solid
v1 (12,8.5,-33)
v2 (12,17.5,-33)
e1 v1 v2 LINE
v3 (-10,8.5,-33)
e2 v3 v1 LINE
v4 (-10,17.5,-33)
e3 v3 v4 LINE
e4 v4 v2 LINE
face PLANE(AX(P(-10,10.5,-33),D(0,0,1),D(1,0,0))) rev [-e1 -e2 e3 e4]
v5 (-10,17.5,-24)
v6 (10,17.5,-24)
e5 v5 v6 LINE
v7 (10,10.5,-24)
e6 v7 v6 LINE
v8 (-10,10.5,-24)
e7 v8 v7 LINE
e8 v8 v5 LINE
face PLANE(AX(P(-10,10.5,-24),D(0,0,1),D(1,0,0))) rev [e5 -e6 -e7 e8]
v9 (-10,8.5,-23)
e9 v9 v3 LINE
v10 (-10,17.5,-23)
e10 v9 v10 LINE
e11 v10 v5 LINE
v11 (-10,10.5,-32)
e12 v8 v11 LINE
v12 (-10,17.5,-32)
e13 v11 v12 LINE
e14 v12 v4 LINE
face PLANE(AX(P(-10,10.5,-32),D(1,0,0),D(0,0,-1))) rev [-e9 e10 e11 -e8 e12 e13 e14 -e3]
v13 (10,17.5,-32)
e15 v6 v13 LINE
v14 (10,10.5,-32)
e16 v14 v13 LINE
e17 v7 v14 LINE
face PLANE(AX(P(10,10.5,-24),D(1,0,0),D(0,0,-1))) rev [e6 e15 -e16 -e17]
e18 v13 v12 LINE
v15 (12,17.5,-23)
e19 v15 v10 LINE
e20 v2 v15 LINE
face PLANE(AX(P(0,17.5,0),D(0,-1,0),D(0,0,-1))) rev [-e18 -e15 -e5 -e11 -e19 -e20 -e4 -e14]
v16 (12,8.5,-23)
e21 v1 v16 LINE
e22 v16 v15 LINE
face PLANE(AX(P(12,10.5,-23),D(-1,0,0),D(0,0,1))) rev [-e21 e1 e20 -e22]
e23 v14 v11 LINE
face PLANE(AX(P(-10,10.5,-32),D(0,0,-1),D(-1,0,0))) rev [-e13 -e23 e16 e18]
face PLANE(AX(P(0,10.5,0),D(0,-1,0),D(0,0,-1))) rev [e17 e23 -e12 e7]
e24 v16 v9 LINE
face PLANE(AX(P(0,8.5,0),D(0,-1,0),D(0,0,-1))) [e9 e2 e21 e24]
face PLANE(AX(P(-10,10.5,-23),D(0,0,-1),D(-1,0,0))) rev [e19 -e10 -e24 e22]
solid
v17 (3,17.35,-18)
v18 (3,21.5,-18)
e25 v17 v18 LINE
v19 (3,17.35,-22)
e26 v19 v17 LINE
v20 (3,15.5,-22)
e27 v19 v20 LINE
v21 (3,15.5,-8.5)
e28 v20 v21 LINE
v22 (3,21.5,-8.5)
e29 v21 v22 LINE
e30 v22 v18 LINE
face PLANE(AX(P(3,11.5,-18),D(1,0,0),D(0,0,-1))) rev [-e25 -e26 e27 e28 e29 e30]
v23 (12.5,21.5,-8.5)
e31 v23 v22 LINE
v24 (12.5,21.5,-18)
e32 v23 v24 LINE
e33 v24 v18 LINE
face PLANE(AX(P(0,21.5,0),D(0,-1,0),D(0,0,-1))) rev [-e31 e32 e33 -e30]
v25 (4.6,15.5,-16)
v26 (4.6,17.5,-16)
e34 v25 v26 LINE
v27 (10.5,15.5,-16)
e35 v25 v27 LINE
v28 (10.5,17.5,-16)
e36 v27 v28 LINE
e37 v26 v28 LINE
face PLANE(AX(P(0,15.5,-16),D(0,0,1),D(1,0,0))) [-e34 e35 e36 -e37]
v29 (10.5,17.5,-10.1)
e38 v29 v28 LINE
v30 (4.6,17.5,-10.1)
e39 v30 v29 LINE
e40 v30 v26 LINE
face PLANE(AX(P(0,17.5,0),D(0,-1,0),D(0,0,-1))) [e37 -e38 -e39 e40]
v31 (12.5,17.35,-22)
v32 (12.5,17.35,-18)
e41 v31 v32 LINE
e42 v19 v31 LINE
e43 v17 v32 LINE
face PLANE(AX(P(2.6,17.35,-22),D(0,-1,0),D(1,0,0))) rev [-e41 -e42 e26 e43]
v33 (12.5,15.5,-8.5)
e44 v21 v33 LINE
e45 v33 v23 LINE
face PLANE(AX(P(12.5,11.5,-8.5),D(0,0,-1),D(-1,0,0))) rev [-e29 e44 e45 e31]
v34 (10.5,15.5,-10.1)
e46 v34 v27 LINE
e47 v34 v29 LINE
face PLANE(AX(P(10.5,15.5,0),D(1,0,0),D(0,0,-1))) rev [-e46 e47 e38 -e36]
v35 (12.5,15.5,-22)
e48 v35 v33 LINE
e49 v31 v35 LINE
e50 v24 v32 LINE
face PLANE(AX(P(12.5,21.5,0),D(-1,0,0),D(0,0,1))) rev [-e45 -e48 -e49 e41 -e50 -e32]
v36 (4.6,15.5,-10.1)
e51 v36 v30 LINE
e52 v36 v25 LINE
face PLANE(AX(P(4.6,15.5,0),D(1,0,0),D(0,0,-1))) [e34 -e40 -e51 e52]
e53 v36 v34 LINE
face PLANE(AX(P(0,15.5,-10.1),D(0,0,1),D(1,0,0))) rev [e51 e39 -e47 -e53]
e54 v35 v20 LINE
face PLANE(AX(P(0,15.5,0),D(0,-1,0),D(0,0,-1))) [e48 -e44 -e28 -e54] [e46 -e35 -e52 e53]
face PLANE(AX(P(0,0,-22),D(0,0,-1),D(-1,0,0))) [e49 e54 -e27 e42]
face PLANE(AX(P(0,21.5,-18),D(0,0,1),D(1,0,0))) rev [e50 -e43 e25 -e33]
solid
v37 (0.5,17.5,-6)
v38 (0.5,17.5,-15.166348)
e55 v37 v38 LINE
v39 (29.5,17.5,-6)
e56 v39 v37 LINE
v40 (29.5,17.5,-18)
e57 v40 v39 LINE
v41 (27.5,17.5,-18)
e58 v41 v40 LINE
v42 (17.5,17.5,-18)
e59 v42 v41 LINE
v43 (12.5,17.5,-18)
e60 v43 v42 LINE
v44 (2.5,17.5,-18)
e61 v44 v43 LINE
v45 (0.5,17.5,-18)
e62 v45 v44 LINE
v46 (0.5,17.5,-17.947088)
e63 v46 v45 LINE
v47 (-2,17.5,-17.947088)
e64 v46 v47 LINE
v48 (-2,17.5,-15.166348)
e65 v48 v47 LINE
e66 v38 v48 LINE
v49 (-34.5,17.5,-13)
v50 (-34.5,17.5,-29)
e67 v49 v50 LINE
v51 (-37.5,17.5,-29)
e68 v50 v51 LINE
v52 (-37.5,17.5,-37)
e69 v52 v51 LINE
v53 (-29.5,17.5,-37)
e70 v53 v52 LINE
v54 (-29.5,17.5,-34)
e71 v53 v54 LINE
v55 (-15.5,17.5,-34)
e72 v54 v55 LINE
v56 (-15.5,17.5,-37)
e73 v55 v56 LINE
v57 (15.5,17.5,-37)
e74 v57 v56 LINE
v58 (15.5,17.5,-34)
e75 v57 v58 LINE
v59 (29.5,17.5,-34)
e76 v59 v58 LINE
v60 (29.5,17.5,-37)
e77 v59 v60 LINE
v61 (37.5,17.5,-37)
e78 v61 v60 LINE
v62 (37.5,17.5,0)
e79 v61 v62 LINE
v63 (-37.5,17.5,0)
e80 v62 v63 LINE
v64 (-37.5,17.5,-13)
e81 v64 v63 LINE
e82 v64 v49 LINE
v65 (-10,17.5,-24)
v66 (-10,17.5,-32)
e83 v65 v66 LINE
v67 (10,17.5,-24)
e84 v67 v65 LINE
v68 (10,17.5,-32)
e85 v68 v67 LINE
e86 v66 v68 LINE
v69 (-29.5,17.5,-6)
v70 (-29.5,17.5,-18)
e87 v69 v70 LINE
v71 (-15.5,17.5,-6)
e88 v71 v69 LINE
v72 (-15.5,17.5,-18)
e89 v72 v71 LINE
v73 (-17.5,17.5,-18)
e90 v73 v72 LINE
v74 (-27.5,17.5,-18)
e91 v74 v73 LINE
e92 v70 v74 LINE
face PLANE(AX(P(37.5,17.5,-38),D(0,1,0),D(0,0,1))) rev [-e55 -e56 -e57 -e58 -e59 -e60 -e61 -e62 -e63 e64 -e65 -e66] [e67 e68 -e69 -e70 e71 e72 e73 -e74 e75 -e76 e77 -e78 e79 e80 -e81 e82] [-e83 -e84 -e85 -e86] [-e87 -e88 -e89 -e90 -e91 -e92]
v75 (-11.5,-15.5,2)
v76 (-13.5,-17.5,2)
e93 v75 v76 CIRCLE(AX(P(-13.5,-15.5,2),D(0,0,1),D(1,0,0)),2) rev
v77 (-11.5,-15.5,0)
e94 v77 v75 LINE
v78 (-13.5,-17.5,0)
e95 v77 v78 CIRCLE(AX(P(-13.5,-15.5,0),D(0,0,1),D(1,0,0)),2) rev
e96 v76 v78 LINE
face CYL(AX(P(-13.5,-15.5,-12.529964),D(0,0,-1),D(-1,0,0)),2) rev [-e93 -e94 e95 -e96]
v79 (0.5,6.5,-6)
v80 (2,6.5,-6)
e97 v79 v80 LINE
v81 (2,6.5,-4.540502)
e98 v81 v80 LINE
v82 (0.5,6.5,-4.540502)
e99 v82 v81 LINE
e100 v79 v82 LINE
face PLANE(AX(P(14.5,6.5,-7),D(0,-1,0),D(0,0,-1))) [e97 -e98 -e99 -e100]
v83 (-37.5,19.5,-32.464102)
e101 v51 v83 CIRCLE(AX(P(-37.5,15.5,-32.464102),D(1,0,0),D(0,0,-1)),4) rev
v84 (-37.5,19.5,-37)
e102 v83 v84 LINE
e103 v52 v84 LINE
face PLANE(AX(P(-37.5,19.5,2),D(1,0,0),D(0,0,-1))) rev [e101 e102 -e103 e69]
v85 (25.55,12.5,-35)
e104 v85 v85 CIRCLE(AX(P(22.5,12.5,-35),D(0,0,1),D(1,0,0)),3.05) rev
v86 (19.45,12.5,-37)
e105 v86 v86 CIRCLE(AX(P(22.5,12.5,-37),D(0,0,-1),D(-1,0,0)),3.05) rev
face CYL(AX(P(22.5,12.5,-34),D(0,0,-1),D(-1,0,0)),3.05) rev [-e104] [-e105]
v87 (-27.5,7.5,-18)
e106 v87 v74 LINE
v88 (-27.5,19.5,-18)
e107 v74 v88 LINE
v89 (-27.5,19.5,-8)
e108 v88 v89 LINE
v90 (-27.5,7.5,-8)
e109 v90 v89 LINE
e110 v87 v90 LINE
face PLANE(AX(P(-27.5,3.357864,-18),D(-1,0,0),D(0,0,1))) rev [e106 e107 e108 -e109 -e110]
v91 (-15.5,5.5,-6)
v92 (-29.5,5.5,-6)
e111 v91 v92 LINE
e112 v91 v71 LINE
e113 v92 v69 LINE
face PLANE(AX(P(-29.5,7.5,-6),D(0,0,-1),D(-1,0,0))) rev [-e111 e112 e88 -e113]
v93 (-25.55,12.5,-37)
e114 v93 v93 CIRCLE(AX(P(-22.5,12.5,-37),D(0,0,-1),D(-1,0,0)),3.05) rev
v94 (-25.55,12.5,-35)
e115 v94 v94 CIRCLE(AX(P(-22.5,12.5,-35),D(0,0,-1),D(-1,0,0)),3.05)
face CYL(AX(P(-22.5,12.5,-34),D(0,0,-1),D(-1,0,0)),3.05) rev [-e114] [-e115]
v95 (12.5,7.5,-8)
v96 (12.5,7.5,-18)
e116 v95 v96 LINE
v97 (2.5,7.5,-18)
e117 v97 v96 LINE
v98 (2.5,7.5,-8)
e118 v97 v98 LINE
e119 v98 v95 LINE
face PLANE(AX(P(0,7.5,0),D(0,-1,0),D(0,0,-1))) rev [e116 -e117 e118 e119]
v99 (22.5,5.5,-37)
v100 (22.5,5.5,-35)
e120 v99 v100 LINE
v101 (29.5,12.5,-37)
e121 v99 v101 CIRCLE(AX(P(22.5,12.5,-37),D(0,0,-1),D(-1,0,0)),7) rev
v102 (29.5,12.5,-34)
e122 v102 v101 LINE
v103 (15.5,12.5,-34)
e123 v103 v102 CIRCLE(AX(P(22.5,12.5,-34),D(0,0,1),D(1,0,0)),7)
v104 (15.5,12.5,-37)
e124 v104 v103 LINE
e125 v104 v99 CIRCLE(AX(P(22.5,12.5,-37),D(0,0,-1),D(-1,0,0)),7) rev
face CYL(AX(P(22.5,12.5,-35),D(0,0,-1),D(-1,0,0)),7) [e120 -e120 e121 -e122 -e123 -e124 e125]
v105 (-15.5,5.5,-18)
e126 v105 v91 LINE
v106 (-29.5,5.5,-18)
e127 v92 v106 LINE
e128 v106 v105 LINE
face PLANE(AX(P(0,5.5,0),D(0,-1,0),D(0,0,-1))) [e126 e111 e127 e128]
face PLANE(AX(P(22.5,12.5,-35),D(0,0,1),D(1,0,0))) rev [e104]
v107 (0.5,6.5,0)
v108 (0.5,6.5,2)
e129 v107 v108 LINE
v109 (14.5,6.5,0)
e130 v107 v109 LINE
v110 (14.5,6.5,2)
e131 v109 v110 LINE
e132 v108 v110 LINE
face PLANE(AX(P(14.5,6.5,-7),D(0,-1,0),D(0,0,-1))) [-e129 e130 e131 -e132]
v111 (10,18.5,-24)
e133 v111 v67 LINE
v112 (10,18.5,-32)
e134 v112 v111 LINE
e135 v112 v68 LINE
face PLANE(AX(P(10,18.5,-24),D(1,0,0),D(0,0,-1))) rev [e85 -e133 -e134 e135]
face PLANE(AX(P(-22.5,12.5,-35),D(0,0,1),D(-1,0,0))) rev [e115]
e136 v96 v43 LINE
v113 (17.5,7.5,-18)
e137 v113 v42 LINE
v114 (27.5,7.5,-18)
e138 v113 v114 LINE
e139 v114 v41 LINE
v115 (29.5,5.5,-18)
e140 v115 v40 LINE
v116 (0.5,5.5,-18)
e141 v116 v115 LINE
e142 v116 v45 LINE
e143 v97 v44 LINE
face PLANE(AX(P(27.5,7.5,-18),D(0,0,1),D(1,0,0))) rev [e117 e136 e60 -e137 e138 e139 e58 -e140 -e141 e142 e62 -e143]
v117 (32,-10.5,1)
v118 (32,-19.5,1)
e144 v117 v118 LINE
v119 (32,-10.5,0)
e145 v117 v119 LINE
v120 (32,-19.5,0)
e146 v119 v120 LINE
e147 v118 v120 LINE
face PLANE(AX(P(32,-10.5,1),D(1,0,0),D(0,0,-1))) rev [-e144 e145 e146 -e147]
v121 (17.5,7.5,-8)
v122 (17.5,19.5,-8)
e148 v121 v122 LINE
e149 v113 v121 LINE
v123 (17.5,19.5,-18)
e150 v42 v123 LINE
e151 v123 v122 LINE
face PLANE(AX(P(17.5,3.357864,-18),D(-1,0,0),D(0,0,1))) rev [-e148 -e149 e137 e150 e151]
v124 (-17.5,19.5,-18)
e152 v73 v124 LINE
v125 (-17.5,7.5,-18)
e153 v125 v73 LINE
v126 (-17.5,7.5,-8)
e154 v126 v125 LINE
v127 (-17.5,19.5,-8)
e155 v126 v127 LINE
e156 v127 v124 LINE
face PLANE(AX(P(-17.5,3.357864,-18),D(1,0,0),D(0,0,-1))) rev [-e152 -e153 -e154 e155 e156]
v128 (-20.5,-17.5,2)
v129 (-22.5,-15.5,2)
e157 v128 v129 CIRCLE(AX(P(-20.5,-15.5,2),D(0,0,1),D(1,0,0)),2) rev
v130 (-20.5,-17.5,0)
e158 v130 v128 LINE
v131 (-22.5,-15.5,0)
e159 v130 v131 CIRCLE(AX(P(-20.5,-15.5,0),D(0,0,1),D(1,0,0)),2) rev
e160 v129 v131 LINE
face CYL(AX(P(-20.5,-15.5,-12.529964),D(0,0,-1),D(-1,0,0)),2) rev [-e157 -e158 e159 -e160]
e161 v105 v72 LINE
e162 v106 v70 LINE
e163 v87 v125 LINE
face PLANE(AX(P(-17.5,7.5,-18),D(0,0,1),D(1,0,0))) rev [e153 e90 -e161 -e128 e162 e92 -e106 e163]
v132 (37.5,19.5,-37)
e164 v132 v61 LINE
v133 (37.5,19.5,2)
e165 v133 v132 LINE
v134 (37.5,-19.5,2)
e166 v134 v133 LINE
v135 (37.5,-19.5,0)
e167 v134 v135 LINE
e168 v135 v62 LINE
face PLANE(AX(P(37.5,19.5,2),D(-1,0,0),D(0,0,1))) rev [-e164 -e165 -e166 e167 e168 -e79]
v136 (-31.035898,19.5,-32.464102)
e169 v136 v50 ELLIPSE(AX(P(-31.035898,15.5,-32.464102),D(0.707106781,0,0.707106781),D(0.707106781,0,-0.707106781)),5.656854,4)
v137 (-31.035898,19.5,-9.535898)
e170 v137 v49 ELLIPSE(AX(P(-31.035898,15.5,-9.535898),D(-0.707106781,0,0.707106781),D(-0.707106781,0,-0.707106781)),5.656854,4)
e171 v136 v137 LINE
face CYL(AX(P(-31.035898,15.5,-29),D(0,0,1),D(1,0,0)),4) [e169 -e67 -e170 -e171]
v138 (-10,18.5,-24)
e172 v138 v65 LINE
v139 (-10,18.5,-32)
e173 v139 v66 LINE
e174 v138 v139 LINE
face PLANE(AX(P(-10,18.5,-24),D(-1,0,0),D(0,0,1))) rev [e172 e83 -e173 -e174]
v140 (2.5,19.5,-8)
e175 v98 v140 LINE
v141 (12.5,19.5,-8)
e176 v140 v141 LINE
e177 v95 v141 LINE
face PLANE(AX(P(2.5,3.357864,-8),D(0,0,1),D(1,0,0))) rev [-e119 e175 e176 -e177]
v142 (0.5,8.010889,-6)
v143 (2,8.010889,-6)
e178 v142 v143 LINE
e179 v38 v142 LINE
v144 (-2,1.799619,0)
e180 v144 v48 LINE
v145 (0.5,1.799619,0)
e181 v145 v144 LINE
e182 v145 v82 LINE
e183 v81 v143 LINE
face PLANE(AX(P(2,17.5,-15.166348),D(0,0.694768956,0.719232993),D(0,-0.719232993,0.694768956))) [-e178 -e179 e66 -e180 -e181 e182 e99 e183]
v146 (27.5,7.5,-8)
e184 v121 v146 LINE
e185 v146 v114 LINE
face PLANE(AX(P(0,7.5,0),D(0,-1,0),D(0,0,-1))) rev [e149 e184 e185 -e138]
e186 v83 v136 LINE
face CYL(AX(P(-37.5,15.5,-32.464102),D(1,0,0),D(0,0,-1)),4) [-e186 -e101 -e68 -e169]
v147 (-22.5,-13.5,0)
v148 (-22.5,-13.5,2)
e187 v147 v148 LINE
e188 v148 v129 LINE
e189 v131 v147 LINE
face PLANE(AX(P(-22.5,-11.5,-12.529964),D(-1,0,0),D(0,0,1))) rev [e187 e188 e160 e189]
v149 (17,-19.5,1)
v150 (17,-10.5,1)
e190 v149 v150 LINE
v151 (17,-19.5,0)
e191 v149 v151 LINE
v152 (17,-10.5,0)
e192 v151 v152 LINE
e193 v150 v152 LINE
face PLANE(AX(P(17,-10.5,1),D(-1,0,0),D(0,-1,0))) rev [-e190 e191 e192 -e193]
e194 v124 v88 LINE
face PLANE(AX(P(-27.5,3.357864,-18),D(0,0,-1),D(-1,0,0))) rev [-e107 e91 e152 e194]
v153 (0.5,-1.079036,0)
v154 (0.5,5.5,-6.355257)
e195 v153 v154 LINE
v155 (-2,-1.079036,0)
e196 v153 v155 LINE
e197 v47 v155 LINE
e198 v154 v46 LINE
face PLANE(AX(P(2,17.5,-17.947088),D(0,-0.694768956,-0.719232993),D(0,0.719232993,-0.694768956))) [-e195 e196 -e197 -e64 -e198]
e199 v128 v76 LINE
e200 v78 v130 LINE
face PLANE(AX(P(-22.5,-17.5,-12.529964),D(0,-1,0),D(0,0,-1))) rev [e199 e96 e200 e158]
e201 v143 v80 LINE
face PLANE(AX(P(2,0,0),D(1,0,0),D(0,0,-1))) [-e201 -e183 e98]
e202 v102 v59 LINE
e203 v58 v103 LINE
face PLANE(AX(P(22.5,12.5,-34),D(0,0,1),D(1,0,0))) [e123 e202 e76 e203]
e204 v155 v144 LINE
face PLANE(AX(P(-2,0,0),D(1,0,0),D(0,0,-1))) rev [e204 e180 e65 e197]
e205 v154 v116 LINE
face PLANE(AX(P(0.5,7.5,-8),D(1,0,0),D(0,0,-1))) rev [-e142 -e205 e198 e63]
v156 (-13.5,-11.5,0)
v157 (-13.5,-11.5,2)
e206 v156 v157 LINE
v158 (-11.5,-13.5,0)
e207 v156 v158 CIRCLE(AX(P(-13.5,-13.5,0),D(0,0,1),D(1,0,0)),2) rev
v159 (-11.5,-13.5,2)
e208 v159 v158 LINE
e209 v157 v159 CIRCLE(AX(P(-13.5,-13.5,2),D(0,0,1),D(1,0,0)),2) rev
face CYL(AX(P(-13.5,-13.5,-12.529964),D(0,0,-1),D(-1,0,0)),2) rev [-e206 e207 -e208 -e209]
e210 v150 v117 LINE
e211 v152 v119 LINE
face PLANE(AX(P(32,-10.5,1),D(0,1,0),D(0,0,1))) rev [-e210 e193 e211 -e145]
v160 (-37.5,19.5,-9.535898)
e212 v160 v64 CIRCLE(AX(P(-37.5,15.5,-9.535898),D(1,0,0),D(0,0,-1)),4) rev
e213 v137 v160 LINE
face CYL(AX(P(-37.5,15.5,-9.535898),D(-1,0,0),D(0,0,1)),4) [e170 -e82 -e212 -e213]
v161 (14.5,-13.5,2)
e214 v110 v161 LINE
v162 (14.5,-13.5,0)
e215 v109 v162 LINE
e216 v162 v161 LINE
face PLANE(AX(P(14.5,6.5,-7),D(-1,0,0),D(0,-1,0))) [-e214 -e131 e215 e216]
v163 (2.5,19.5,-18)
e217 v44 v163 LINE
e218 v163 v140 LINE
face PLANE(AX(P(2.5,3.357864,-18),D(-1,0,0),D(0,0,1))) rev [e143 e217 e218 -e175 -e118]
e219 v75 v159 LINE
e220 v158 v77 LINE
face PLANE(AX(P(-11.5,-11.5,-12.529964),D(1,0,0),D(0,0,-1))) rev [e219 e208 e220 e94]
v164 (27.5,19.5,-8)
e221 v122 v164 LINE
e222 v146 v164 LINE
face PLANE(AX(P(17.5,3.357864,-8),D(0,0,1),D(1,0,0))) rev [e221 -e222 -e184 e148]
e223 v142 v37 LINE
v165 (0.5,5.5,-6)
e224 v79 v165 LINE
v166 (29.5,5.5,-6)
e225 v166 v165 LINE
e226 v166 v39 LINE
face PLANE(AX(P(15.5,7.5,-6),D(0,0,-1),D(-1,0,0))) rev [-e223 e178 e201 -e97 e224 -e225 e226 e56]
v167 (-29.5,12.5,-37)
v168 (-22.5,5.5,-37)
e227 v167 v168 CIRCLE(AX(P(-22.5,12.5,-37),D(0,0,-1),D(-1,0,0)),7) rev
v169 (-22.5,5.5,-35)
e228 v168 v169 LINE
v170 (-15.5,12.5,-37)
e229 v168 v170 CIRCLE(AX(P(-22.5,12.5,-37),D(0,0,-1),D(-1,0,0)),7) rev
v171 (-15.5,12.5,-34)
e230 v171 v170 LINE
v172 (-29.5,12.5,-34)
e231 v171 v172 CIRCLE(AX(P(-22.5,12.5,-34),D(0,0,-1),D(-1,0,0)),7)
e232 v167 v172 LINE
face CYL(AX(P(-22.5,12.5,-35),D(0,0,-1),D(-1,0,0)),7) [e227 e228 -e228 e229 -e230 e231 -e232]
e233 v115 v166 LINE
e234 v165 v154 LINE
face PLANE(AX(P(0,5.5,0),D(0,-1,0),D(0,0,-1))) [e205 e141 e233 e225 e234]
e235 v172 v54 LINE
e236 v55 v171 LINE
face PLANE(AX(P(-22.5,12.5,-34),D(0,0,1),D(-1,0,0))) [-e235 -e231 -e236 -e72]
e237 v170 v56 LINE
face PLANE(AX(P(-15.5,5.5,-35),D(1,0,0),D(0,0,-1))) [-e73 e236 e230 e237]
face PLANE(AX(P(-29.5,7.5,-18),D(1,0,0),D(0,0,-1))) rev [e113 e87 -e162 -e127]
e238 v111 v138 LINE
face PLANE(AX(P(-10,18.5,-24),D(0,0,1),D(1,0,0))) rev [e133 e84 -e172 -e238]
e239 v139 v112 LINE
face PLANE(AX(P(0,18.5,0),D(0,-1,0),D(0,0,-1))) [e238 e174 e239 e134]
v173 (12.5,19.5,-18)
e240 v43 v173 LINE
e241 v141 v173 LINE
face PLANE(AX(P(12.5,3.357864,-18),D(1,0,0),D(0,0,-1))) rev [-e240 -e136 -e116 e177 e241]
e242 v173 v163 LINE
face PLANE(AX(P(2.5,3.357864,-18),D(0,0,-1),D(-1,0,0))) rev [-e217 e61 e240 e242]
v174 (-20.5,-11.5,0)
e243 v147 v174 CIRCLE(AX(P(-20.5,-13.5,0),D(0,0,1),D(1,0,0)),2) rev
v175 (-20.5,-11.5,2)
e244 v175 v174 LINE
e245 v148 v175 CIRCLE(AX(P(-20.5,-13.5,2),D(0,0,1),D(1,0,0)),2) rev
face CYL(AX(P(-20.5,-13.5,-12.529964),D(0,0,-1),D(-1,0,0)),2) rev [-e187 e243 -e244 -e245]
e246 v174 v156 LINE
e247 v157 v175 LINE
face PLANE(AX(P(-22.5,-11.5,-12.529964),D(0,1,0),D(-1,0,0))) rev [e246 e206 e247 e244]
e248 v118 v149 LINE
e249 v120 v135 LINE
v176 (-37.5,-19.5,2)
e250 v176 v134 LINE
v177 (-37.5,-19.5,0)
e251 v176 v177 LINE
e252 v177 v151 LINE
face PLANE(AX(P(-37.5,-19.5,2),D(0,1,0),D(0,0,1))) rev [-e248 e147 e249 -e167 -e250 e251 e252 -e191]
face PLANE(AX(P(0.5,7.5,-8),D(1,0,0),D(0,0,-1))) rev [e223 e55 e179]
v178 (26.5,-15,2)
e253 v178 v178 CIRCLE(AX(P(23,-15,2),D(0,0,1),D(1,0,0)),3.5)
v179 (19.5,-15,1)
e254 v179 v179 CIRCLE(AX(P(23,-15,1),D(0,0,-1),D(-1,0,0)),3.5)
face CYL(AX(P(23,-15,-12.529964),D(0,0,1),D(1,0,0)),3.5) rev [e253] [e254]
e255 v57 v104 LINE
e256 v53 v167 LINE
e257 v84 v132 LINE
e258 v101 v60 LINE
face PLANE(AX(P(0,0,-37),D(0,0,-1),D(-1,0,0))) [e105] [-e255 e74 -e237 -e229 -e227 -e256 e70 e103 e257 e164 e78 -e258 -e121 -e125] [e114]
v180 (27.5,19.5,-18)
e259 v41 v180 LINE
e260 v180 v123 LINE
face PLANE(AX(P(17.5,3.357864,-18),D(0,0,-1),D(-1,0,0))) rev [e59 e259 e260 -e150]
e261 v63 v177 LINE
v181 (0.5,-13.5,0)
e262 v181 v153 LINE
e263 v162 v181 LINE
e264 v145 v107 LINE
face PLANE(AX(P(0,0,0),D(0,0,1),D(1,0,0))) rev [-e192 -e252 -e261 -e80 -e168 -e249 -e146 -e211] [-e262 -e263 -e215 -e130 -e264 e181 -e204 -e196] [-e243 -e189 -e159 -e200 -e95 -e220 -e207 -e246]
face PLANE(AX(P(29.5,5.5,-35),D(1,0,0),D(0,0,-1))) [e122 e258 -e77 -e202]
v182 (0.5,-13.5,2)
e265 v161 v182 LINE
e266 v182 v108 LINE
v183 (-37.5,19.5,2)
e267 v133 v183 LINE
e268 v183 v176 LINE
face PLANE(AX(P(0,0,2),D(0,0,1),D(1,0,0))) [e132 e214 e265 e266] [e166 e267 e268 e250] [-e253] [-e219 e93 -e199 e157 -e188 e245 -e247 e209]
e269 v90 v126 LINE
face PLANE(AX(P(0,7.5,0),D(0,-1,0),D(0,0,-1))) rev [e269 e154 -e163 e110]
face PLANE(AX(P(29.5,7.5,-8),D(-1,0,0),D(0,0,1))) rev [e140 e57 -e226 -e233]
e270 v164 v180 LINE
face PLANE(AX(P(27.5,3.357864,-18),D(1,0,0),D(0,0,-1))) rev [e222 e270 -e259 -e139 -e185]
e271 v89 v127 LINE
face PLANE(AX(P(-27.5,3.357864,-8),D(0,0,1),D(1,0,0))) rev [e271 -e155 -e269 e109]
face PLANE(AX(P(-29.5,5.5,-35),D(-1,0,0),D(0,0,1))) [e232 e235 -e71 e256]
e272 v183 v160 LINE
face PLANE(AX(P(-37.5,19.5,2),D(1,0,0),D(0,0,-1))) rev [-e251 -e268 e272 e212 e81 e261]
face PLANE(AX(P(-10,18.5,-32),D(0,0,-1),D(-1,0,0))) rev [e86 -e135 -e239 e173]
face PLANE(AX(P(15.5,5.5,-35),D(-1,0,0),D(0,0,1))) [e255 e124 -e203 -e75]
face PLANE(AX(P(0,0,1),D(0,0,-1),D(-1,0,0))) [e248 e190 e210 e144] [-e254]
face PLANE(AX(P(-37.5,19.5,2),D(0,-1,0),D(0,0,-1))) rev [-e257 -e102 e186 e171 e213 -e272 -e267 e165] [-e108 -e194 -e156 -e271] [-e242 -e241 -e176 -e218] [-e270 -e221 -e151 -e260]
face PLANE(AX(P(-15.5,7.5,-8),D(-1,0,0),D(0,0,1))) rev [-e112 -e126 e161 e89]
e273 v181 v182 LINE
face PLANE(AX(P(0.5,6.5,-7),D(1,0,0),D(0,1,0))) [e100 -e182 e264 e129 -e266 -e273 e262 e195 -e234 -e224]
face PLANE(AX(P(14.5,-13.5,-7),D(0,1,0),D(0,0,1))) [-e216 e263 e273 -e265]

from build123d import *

# Parameters (mm, degrees)
SKETCH1_W                 = 75
SKETCH1_H                 = 39
BOSS_EXTRUDE1_DEPTH       = 2
SKETCH2_W                 = 75
SKETCH2_H                 = 2
BOSS_EXTRUDE2_DEPTH       = 38
SKETCH4_R                 = 3.5
SKETCH4_R_2               = 2.25
SKETCH4_W                 = 11
SKETCH4_H                 = 6
CUT_EXTRUDE1_DEPTH        = 2
SKETCH6_W                 = 10
SKETCH6_H                 = 10
CUT_EXTRUDE2_DEPTH        = 2
BOSS_EXTRUDE3_DEPTH       = 10
SKETCH8_W                 = 14
SKETCH8_H                 = 12
BOSS_EXTRUDE4_DEPTH       = 2
SKETCH9_W                 = 10
SKETCH9_H                 = 10
BOSS_EXTRUDE5_DEPTH       = 4
SKETCH10_W                = 9.9
SKETCH10_H                = 9.9
SKETCH10_W_2              = 5.9
SKETCH10_H_2              = 5.9
BOSS_EXTRUDE9_DEPTH       = 2
SKETCH11_W                = 9.9
SKETCH11_H                = 1.85
BOSS_EXTRUDE10_DEPTH      = 4
SKETCH12_R                = 4.25
SKETCH12_R_2              = 2.25
BOSS_EXTRUDE11_DEPTH      = 2
SKETCH16_W                = 14
SKETCH16_H                = 9.5
SKETCH16_W_2              = 11
SKETCH16_H_2              = 6
BOSS_EXTRUDE13_DEPTH      = 2
CUT_EXTRUDE3_DEPTH        = 65.955754172
FILLET1_R                 = 2
FILLET2_R                 = 2
BOSS_EXTRUDE14_DEPTH      = 2
BOSS_EXTRUDE14_DEPTH_BACK = 2
CUT_EXTRUDE4_DEPTH        = 7
CUT_EXTRUDE4_DEPTH_BACK   = 10
SKETCH19_W                = 14
SKETCH19_H                = 20
SKETCH22_W                = 14
SKETCH22_H                = 14
BOSS_EXTRUDE15_DEPTH      = 3
FILLET3_R                 = 7
SKETCH23_R                = 3.05
CUT_EXTRUDE6_DEPTH        = 4
SKETCH24_W                = 1
SKETCH24_H                = 12
BOSS_EXTRUDE16_DEPTH      = 12
SKETCH25_W                = 16.318850604
SKETCH25_H                = 8.975597068
SKETCH25_W_2              = 14
SKETCH25_H_2              = 9.692484115
CUT_EXTRUDE7_DEPTH        = 2
CUT_EXTRUDE8_START        = -2
SKETCH26_R                = 4.25
CUT_EXTRUDE8_DEPTH        = 2
SKETCH27_R                = 2.25
BOSS_EXTRUDE17_DEPTH      = 2
SKETCH28_W                = 85.525995753
SKETCH28_H                = 26.786934063
CUT_EXTRUDE9_DEPTH        = 1
BOSS_EXTRUDE18_DEPTH      = 1
CUT_EXTRUDE10_DEPTH       = 10
CUT_EXTRUDE11_START       = -1
SKETCH31_W                = 15
SKETCH31_H                = 9
SKETCH31_R                = 3.5
CUT_EXTRUDE11_DEPTH       = 1
SKETCH32_W                = 20
SKETCH32_H                = 8
CUT_EXTRUDE12_DEPTH       = 1
BOSS_EXTRUDE19_START      = -1
SKETCH34_W                = 14
SKETCH34_H                = 1
BOSS_EXTRUDE19_DEPTH      = 1
SKETCH35_W                = 3
SKETCH35_H                = 16
CUT_EXTRUDE13_DEPTH       = 66.545785524
FILLET4_R                 = 4
SKETCH36_W                = 0.4
SKETCH36_H                = 4
CUT_EXTRUDE14_DEPTH       = 10
BOSS_EXTRUDE20_DEPTH      = 7
SKETCH38_W                = 22
SKETCH38_H                = 10
BOSS_EXTRUDE21_DEPTH      = 2


# Some blends are built 0.0001 mm under size
with BuildPart() as part:
    # Sketch1 → Boss-Extrude1 (new body)
    with BuildSketch(Plane.XY):
        Rectangle(SKETCH1_W, SKETCH1_H)
    extrude(amount=BOSS_EXTRUDE1_DEPTH)

    # Sketch2 → Boss-Extrude2 (add)
    with BuildSketch(Plane(origin=(0, 0, 0), x_dir=(-1, 0, 0), z_dir=(0, 0, -1))):
        with Locations((0, 18.5)):
            Rectangle(SKETCH2_W, SKETCH2_H)
    extrude(amount=BOSS_EXTRUDE2_DEPTH)

    # Sketch4 → Cut-Extrude1 (cut)
    with BuildSketch(Plane.XY.offset(2)):
        with Locations((23, -15)):
            Circle(SKETCH4_R)
        with Locations((23, 4.5)):
            Circle(SKETCH4_R_2)
        with Locations((-17, -14.5)):
            Rectangle(SKETCH4_W, SKETCH4_H)
    extrude(amount=-CUT_EXTRUDE1_DEPTH, mode=Mode.SUBTRACT)

    # Sketch6 → Cut-Extrude2 (cut)
    with BuildSketch(Plane(origin=(0, 19.5, 0), x_dir=(1, 0, 0), z_dir=(0, 1, 0))):
        with Locations((7.5, 13)):
            Rectangle(SKETCH6_W, SKETCH6_H)
        with Locations((22.5, 13)):
            Rectangle(SKETCH6_W, SKETCH6_H)
        with Locations((-22.5, 13)):
            Rectangle(SKETCH6_W, SKETCH6_H)
    extrude(amount=-CUT_EXTRUDE2_DEPTH, mode=Mode.SUBTRACT)

    # Sketch7 → Boss-Extrude3 (add)
    with BuildSketch(Plane.XZ.offset(-17.5)):
        Polygon((17.5, -8), (17.5, -18), (15.5, -18), (15.5, -8), (15.5, -6), (29.5, -6), (29.5, -8), (29.5, -18), (27.5, -18), (27.5, -8), align=None)
        Polygon((2.5, -8), (2.5, -18), (0.5, -18), (0.5, -8), (0.5, -6), (14.5, -6), (14.5, -8), (14.5, -18), (12.5, -18), (12.5, -8), align=None)
        Polygon((-17.5, -8), (-17.5, -18), (-15.5, -18), (-15.5, -8), (-15.5, -6), (-29.5, -6), (-29.5, -8), (-29.5, -18), (-27.5, -18), (-27.5, -8), align=None)
    extrude(amount=BOSS_EXTRUDE3_DEPTH)

    # Sketch8 → Boss-Extrude4 (add)
    with BuildSketch(Plane.XZ.offset(-7.5)):
        with Locations((-22.5, -12)):
            Rectangle(SKETCH8_W, SKETCH8_H)
        with Locations((7.5, -12)):
            Rectangle(SKETCH8_W, SKETCH8_H)
        with Locations((22.5, -12)):
            Rectangle(SKETCH8_W, SKETCH8_H)
    extrude(amount=BOSS_EXTRUDE4_DEPTH)

    # Sketch12 → Boss-Extrude11 (add)
    with BuildSketch(Plane(origin=(0, 0, 0), x_dir=(-1, 0, 0), z_dir=(0, 0, -1))):
        with Locations(Location((-23, 4.5, 0), (0, 0, 180))):
            Circle(SKETCH12_R)
        with Locations(Location((-23, 4.5, 0), (0, 0, 180))):
            Circle(SKETCH12_R_2, mode=Mode.SUBTRACT)
    extrude(amount=BOSS_EXTRUDE11_DEPTH)

    # Sketch16 → Boss-Extrude13 (add)
    with BuildSketch(Plane(origin=(0, 0, 0), x_dir=(-1, 0, 0), z_dir=(0, 0, -1))):
        with Locations((17, -14.75)):
            Rectangle(SKETCH16_W, SKETCH16_H)
        with Locations((17, -14.5)):
            Rectangle(SKETCH16_W_2, SKETCH16_H_2, mode=Mode.SUBTRACT)
    extrude(amount=BOSS_EXTRUDE13_DEPTH)

    # Fillet1
    fillet1_edges = [part.edges().sort_by_distance(p)[0] for p in [
        (-22.5, -17.5, 0),
        (-22.5, -11.5, 0),
        (-11.5, -11.5, 0),
        (-11.5, -17.5, 0),
    ]]
    fillet(fillet1_edges, radius=FILLET1_R)

    # Fillet2
    fillet2_edges = [part.edges().sort_by_distance(p)[0] for p in [
        (-10, -10, -1),
        (-24, -10, -1),
    ]]
    fillet(fillet2_edges, radius=FILLET2_R)

    # Sketch18 → Boss-Extrude14 (add, two sides: drawn at the far end of the back side and taken through both)
    with BuildSketch(Plane.ZY.offset(-BOSS_EXTRUDE14_DEPTH_BACK)):
        Polygon((-15.16634768, 17.5), (0, 1.799618541), (0, -1.079036274), (-17.947087746, 17.5), align=None)
    extrude(amount=BOSS_EXTRUDE14_DEPTH + BOSS_EXTRUDE14_DEPTH_BACK)

    # Sketch19 → Cut-Extrude4 (cut, two sides: drawn at the far end of the back side and taken through both)
    with BuildSketch(Plane(origin=(0, 0, 0), x_dir=(-1, 0, 0), z_dir=(0, 0, -1)).offset(-CUT_EXTRUDE4_DEPTH_BACK)):
        with Locations((-7.5, -3.5)):
            Rectangle(SKETCH19_W, SKETCH19_H)
    extrude(amount=CUT_EXTRUDE4_DEPTH + CUT_EXTRUDE4_DEPTH_BACK, mode=Mode.SUBTRACT)

    # Sketch22 → Boss-Extrude15 (add)
    with BuildSketch(Plane(origin=(0, 0, -38), x_dir=(-1, 0, 0), z_dir=(0, 0, -1))):
        with Locations((-22.5, 12.5)):
            Rectangle(SKETCH22_W, SKETCH22_H)
        with Locations((22.5, 12.5)):
            Rectangle(SKETCH22_W, SKETCH22_H)
    extrude(amount=-BOSS_EXTRUDE15_DEPTH)

    # Fillet3
    fillet3_edges = [part.edges().sort_by_distance(p)[0] for p in [
        (-29.5, 5.5, -36.5),
        (-15.5, 5.5, -36.5),
        (15.5, 5.5, -36.5),
        (29.5, 5.5, -36.5),
    ]]
    fillet(fillet3_edges, radius=FILLET3_R - 0.0001)  # a hair under: the kernel refuses the full size

    # Sketch23 → Cut-Extrude6 (cut)
    with BuildSketch(Plane(origin=(0, 0, -38), x_dir=(-1, 0, 0), z_dir=(0, 0, -1))):
        with Locations((-22.5, 12.5)):
            Circle(SKETCH23_R)
        with Locations((22.5, 12.5)):
            Circle(SKETCH23_R)
    extrude(amount=-CUT_EXTRUDE6_DEPTH, mode=Mode.SUBTRACT)

    # Sketch24 → Boss-Extrude16 (add)
    with BuildSketch(Plane.XZ.offset(-5.5)):
        with Locations((15, -12)):
            Rectangle(SKETCH24_W, SKETCH24_H)
    extrude(amount=-BOSS_EXTRUDE16_DEPTH)

    # Sketch25 → Cut-Extrude7 (cut)
    with BuildSketch(Plane(origin=(0, 0, -2), x_dir=(-1, 0, 0), z_dir=(0, 0, -1))):
        with Locations((-23, -15)):
            Rectangle(SKETCH25_W, SKETCH25_H)
        with Locations((17, -14.653757943)):
            Rectangle(SKETCH25_W_2, SKETCH25_H_2)
    extrude(amount=-CUT_EXTRUDE7_DEPTH, mode=Mode.SUBTRACT)

    # Sketch26 → Cut-Extrude8 (cut)
    with BuildSketch(Plane(origin=(0, 0, -2), x_dir=(-1, 0, 0), z_dir=(0, 0, -1)).offset(CUT_EXTRUDE8_START)):
        with Locations((-23, 4.5)):
            Circle(SKETCH26_R)
    extrude(amount=CUT_EXTRUDE8_DEPTH, mode=Mode.SUBTRACT)

    # Sketch27 → Boss-Extrude17 (add)
    with BuildSketch(Plane.XY.offset(2)):
        with Locations((23, 4.5)):
            Circle(SKETCH27_R)
    extrude(amount=-BOSS_EXTRUDE17_DEPTH)

    # Sketch28 → Cut-Extrude9 (cut)
    with BuildSketch(Plane(origin=(0, 0, -38), x_dir=(-1, 0, 0), z_dir=(0, 0, -1))):
        with Locations((0.270543114, 11.591218851)):
            Rectangle(SKETCH28_W, SKETCH28_H)
    extrude(amount=-CUT_EXTRUDE9_DEPTH, mode=Mode.SUBTRACT)

    # Sketch29 → Boss-Extrude18 (add)
    with BuildSketch(Plane.XY.offset(-35)):
        with BuildLine():
            Line((15.5, 17.5), (29.5, 17.5))
            Line((29.5, 17.5), (29.5, 12.5))
            ThreePointArc((29.5, 12.5), (22.5, 5.5), (15.5, 12.5))
            Line((15.5, 12.5), (15.5, 17.5))
        make_face()
    boss_extrude18 = extrude(amount=BOSS_EXTRUDE18_DEPTH)

    # Mirror1: Boss-Extrude18 across plane
    add(boss_extrude18.mirror(Plane.ZY))

    # Sketch31 → Cut-Extrude11 (cut)
    with BuildSketch(Plane(origin=(0, 0, 0), x_dir=(-1, 0, 0), z_dir=(0, 0, -1)).offset(CUT_EXTRUDE11_START)):
        with Locations((-24.5, -15)):
            Rectangle(SKETCH31_W, SKETCH31_H)
        with Locations(Location((-23, -15, 0), (0, 0, 180))):
            Circle(SKETCH31_R, mode=Mode.SUBTRACT)
    extrude(amount=CUT_EXTRUDE11_DEPTH, mode=Mode.SUBTRACT)

    # Sketch32 → Cut-Extrude12 (cut)
    with BuildSketch(Plane.XZ.offset(-17.5)):
        with Locations((0, -28)):
            Rectangle(SKETCH32_W, SKETCH32_H)
    extrude(amount=-CUT_EXTRUDE12_DEPTH, mode=Mode.SUBTRACT)

    # Sketch34 → Boss-Extrude19 (add)
    with BuildSketch(Plane.XZ.offset(-5.5).offset(BOSS_EXTRUDE19_START)):
        with Locations((7.5, -6.5)):
            Rectangle(SKETCH34_W, SKETCH34_H)
    extrude(amount=BOSS_EXTRUDE19_DEPTH)

    # Sketch35 → Cut-Extrude13 (cut, through all)
    with BuildSketch(Plane(origin=(0, 19.5, 0), x_dir=(1, 0, 0), z_dir=(0, 1, 0))):
        with Locations((-36, 21)):
            Rectangle(SKETCH35_W, SKETCH35_H)
    extrude(amount=-CUT_EXTRUDE13_DEPTH, mode=Mode.SUBTRACT)

    # Fillet4
    # the kernel refuses this fillet: 4 mm, written as the material it takes off along each edge
    with BuildSketch(Plane(origin=(-34.5, 19.5, -13), x_dir=(0, 0, 1), z_dir=(-1, 0, 0)), Plane(origin=(-46.160254038, 19.5, -29), x_dir=(0, 0, -1), z_dir=(1, 0, 0))) as fillet4_piece_1:
        with BuildLine():
            CenterArc((3.464101615, -4), FILLET4_R, 90, 60)
            Line((0, -2), (-0.069282032, -1.96))
            ThreePointArc((-0.069282032, -1.96), (-0.08, -1), (-0.08, 0))
            Line((-0.08, 0), (0, 0.08))
            Line((0, 0.08), (3.464101615, 0.08))
            Line((3.464101615, 0.08), (3.464101615, 0))
        make_face()
    extrude(amount=11.660254038, mode=Mode.SUBTRACT)
    with BuildSketch(Plane(origin=(-34.5, 19.5, -29), x_dir=(1, 0, 0), z_dir=(0, 0, 1))) as fillet4_piece_2:
        with BuildLine():
            CenterArc((3.464101615, -4), FILLET4_R, 90, 60)
            Line((0, -2), (-0.069282032, -1.96))
            ThreePointArc((-0.069282032, -1.96), (-0.08, -1), (-0.08, 0))
            Line((-0.08, 0), (0, 0.08))
            Line((0, 0.08), (3.464101615, 0.08))
            Line((3.464101615, 0.08), (3.464101615, 0))
        make_face()
    extrude(amount=16, mode=Mode.SUBTRACT)
    with BuildSketch(Plane(origin=(-25.839745962, 19.5, -13), x_dir=(0, 0, 1), z_dir=(-1, 0, 0))) as fillet4_piece_3a_section:
        with BuildLine():
            CenterArc((3.464101615, -4), FILLET4_R, 90, 60)
            Line((0, -2), (-0.069282032, -1.96))
            ThreePointArc((-0.069282032, -1.96), (-0.08, -1), (-0.08, 0))
            Line((-0.08, 0), (0, 0.08))
            Line((0, 0.08), (3.464101615, 0.08))
            Line((3.464101615, 0.08), (3.464101615, 0))
        make_face()
    fillet4_piece_3a = extrude(amount=20.320508076, mode=Mode.PRIVATE)
    fillet4_piece_3a = split(fillet4_piece_3a, bisect_by=Plane(origin=(-34.5, 18.981933156, -12.134758217), z_dir=(1, 0, 0)), keep=Keep.TOP, mode=Mode.PRIVATE)
    with BuildSketch(Plane(origin=(-34.5, 19.5, -29), x_dir=(1, 0, 0), z_dir=(0, 0, 1))) as fillet4_piece_3b_section:
        with BuildLine():
            CenterArc((3.464101615, -4), FILLET4_R, 90, 60)
            Line((0, -2), (-0.069282032, -1.96))
            ThreePointArc((-0.069282032, -1.96), (-0.08, -1), (-0.08, 0))
            Line((-0.08, 0), (0, 0.08))
            Line((0, 0.08), (3.464101615, 0.08))
            Line((3.464101615, 0.08), (3.464101615, 0))
        make_face()
    fillet4_piece_3b = extrude(amount=24.660254038, mode=Mode.PRIVATE)
    fillet4_piece_3b = split(fillet4_piece_3b, bisect_by=Plane(origin=(-33.634758217, 18.981933156, -13), z_dir=(0, 0, 1)), keep=Keep.TOP, mode=Mode.PRIVATE)
    fillet4_piece_3 = fillet4_piece_3a & fillet4_piece_3b
    add(fillet4_piece_3, mode=Mode.SUBTRACT)
    with BuildSketch(Plane(origin=(-34.5, 19.5, -37.660254038), x_dir=(1, 0, 0), z_dir=(0, 0, 1))) as fillet4_piece_4a_section:
        with BuildLine():
            CenterArc((3.464101615, -4), FILLET4_R, 90, 60)
            Line((0, -2), (-0.069282032, -1.96))
            ThreePointArc((-0.069282032, -1.96), (-0.08, -1), (-0.08, 0))
            Line((-0.08, 0), (0, 0.08))
            Line((0, 0.08), (3.464101615, 0.08))
            Line((3.464101615, 0.08), (3.464101615, 0))
        make_face()
    fillet4_piece_4a = extrude(amount=24.660254038, mode=Mode.PRIVATE)
    fillet4_piece_4a = split(fillet4_piece_4a, bisect_by=Plane(origin=(-33.634758217, 18.981933156, -29), z_dir=(0, 0, -1)), keep=Keep.TOP, mode=Mode.PRIVATE)
    with BuildSketch(Plane(origin=(-46.160254038, 19.5, -29), x_dir=(0, 0, -1), z_dir=(1, 0, 0))) as fillet4_piece_4b_section:
        with BuildLine():
            CenterArc((3.464101615, -4), FILLET4_R, 90, 60)
            Line((0, -2), (-0.069282032, -1.96))
            ThreePointArc((-0.069282032, -1.96), (-0.08, -1), (-0.08, 0))
            Line((-0.08, 0), (0, 0.08))
            Line((0, 0.08), (3.464101615, 0.08))
            Line((3.464101615, 0.08), (3.464101615, 0))
        make_face()
    fillet4_piece_4b = extrude(amount=20.320508076, mode=Mode.PRIVATE)
    fillet4_piece_4b = split(fillet4_piece_4b, bisect_by=Plane(origin=(-34.5, 18.981933156, -29.865241783), z_dir=(1, 0, 0)), keep=Keep.TOP, mode=Mode.PRIVATE)
    fillet4_piece_4 = fillet4_piece_4a & fillet4_piece_4b
    add(fillet4_piece_4, mode=Mode.SUBTRACT)


with BuildPart() as body_2:
    # Sketch9 → Boss-Extrude5 (new body)
    with BuildSketch(Plane.XZ.offset(-17.5)):
        with Locations((7.5, -13)):
            Rectangle(SKETCH9_W, SKETCH9_H)
    extrude(amount=-BOSS_EXTRUDE5_DEPTH)

    # Sketch10 → Boss-Extrude9 (add)
    with BuildSketch(Plane.XZ.offset(-17.5)):
        with Locations((7.55, -13.05)):
            Rectangle(SKETCH10_W, SKETCH10_H)
        with Locations((7.55, -13.05)):
            Rectangle(SKETCH10_W_2, SKETCH10_H_2, mode=Mode.SUBTRACT)
    extrude(amount=BOSS_EXTRUDE9_DEPTH)

    # Sketch11 → Boss-Extrude10 (add)
    with BuildSketch(Plane(origin=(0, 0, -18), x_dir=(-1, 0, 0), z_dir=(0, 0, -1))):
        with Locations((-7.55, 16.425)):
            Rectangle(SKETCH11_W, SKETCH11_H)
    extrude(amount=BOSS_EXTRUDE10_DEPTH)

    # Sketch17 → Cut-Extrude3 (cut, through all)
    with BuildSketch(Plane.XZ.offset(-17.5)):
        Polygon((2.5, -8.1), (2.5, -18), (2.6, -18), (2.6, -8.1), (12.5, -8.1), (12.5, -8), (2.6, -8), (2.5, -8), align=None)
    extrude(amount=-CUT_EXTRUDE3_DEPTH, mode=Mode.SUBTRACT)

    # Sketch30 → Cut-Extrude10 (cut)
    with BuildSketch(Plane(origin=(0, 21.5, 0), x_dir=(1, 0, 0), z_dir=(0, 1, 0))):
        Polygon((2.5, 18), (3, 18), (3, 8.5), (12.5, 8.5), (12.5, 8), (2.5, 8), align=None)
    extrude(amount=-CUT_EXTRUDE10_DEPTH, mode=Mode.SUBTRACT)

    # Sketch36 → Cut-Extrude14 (cut)
    with BuildSketch(Plane.XZ.offset(-15.5)):
        with Locations((2.8, -20)):
            Rectangle(SKETCH36_W, SKETCH36_H)
    extrude(amount=-CUT_EXTRUDE14_DEPTH, mode=Mode.SUBTRACT)


with BuildPart() as body_3:
    # Sketch37 → Boss-Extrude20 (new body)
    with BuildSketch(Plane.XZ.offset(-17.5)):
        Polygon((-10, -32), (-10, -33), (12, -33), (12, -23), (-10, -23), (-10, -24), (10, -24), (10, -32), align=None)
    extrude(amount=BOSS_EXTRUDE20_DEPTH)

    # Sketch38 → Boss-Extrude21 (add)
    with BuildSketch(Plane.XZ.offset(-10.5)):
        with Locations((1, -28)):
            Rectangle(SKETCH38_W, SKETCH38_H)
    extrude(amount=BOSS_EXTRUDE21_DEPTH)


solid = Compound([part.part, body_2.part, body_3.part])
